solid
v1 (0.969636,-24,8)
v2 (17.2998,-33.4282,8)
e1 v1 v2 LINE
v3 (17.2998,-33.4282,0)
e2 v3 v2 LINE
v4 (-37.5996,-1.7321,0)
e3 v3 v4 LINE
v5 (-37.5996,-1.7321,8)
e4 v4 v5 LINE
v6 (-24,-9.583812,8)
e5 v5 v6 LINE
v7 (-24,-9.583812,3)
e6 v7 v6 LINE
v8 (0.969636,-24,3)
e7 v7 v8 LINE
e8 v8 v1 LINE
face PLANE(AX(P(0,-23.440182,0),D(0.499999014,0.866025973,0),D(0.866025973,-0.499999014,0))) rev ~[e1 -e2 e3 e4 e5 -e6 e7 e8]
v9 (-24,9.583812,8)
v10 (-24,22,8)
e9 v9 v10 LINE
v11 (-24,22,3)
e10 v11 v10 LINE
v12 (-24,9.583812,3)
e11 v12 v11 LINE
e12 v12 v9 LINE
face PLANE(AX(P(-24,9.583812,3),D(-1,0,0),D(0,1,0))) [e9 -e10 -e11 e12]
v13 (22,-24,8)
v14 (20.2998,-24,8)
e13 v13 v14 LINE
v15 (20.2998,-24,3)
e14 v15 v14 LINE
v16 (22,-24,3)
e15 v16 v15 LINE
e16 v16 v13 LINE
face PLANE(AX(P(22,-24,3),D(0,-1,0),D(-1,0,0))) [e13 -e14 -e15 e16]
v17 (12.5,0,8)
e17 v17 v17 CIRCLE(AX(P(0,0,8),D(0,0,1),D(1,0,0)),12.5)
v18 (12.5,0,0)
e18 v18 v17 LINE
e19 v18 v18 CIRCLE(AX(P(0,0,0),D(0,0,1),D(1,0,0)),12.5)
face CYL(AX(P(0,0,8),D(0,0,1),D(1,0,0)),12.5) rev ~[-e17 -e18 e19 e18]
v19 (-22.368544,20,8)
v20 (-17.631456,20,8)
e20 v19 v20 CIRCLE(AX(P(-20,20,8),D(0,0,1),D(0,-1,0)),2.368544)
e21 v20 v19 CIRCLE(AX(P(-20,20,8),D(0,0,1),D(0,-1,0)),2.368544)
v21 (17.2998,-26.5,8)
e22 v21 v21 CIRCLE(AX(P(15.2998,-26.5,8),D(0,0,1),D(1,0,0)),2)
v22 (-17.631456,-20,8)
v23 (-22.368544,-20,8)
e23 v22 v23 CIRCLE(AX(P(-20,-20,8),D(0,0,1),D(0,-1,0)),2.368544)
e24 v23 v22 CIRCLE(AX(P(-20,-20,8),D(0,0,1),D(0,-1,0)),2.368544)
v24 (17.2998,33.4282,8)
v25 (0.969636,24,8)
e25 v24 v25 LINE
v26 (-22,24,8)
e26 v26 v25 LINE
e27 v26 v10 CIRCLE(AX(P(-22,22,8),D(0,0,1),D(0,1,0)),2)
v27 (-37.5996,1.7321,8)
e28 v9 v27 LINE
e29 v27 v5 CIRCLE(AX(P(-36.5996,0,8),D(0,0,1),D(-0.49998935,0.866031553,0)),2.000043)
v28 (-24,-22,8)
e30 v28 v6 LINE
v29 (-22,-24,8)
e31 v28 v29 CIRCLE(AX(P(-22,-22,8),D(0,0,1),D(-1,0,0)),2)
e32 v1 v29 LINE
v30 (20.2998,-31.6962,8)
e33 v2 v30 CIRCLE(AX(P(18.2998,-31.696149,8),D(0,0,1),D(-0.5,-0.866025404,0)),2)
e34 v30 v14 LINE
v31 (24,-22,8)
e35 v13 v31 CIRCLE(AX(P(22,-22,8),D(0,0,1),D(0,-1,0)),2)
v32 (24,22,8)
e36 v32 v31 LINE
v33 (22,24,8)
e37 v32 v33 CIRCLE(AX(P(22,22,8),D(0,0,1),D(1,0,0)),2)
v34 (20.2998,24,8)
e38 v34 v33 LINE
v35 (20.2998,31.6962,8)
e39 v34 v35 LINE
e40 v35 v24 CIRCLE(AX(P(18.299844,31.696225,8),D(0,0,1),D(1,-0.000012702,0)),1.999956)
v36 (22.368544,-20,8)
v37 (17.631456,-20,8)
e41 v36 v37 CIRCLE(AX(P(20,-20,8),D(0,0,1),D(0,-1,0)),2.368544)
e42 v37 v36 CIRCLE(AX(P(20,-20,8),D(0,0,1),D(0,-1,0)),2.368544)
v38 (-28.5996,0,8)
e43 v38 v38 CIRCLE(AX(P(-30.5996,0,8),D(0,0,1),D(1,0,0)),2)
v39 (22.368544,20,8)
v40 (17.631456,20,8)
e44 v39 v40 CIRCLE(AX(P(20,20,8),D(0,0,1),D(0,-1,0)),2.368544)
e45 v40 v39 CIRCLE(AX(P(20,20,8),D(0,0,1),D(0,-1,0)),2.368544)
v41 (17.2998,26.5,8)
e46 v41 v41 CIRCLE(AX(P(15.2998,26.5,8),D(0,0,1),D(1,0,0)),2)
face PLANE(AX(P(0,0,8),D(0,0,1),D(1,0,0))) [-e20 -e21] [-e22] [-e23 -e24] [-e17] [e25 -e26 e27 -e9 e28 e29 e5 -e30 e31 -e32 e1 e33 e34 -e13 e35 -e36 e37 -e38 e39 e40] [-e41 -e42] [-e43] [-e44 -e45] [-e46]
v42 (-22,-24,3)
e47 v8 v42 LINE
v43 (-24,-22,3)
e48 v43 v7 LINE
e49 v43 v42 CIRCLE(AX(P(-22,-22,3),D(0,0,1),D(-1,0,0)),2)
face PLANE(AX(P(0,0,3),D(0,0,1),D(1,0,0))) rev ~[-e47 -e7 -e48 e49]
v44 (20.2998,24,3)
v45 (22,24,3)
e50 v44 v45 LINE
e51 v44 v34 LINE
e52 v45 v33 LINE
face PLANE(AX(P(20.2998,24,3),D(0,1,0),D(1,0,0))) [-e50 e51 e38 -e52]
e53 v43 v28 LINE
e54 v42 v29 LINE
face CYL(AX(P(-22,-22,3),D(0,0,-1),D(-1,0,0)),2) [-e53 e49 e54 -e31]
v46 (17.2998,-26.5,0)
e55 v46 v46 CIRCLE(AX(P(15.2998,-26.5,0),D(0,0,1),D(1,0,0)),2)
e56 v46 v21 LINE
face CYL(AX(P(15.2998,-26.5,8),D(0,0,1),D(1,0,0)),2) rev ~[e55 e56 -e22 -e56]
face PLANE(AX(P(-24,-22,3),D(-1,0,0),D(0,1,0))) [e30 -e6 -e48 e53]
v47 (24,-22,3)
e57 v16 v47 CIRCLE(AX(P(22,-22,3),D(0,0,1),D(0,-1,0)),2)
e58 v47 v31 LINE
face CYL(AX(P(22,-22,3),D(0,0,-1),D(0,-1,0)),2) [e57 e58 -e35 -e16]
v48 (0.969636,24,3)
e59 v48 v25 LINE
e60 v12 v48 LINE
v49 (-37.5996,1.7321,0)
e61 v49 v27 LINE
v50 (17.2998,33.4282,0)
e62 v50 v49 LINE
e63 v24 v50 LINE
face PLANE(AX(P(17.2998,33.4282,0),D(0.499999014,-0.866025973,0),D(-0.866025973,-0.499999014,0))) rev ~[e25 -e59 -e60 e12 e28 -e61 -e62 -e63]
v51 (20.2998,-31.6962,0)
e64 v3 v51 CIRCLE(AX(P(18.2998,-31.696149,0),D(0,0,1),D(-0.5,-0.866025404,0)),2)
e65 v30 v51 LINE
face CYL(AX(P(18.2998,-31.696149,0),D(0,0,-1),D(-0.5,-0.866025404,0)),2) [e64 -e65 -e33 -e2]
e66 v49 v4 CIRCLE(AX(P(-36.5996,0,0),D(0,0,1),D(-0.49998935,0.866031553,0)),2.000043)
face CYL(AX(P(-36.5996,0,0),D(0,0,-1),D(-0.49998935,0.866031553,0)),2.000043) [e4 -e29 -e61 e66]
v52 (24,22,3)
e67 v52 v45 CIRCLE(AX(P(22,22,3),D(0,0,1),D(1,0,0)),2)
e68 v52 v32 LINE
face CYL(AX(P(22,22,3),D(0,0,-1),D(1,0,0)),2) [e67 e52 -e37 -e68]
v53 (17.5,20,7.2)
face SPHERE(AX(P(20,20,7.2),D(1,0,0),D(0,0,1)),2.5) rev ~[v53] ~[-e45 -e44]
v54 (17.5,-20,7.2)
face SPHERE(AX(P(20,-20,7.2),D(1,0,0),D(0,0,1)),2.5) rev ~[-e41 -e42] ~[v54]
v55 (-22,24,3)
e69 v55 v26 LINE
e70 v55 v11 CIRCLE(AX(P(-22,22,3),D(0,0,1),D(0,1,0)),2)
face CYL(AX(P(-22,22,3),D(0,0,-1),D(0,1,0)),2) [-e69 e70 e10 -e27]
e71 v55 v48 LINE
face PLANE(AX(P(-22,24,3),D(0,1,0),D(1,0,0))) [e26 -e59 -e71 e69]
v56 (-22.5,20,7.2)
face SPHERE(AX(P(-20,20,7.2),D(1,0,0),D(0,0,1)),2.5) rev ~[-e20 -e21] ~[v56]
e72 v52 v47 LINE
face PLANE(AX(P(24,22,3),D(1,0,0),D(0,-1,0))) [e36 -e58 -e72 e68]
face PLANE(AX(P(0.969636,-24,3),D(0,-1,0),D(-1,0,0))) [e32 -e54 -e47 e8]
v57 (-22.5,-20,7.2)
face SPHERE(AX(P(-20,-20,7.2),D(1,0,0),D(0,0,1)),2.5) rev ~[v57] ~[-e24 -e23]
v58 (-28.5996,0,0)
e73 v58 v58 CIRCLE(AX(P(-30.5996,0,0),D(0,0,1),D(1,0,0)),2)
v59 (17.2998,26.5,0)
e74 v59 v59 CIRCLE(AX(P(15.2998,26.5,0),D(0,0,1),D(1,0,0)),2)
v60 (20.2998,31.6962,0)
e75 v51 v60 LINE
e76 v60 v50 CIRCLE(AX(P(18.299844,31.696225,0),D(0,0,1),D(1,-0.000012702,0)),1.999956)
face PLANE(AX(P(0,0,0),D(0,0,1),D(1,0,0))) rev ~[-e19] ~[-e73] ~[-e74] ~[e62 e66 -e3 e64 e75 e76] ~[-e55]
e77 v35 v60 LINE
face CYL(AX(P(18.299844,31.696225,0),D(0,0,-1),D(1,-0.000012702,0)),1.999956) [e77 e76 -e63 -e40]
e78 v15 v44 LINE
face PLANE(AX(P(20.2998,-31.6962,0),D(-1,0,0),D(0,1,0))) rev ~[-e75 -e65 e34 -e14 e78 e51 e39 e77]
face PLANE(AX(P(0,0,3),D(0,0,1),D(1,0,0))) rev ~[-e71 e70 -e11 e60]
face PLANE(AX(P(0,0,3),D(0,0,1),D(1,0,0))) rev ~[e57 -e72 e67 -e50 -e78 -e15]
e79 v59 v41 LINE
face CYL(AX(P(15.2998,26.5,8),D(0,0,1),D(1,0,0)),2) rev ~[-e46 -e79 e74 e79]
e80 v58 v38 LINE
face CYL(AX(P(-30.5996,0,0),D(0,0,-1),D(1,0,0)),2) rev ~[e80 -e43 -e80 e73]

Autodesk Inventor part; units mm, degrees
ref_plane "YZ Plane" through (0, 0, 0) normal (1, 0, 0) x (0, 1, 0)
ref_plane "XZ Plane" through (0, 0, 0) normal (0, 1, 0) x (-1, 0, 0)
ref_plane "XY Plane" through (0, 0, 0) normal (0, 0, 1) x (1, 0, 0)
sketch "Sketch1" plane through (0, 0, 0) normal (0, 0, 1) x (1, 0, 0)
  line L0 (15.2998, 26.5) -> (15.2998, -26.5) construction
  line L1 (15.2998, -26.5) -> (-30.5996, 0) construction
  line L2 (-30.5996, 0) -> (15.2998, 26.5) construction
  line L3 (0, 48.0119) -> (0, -48.0119) projected
  circle A0 centre (0, 0) radius 12.5
  line L4 (24.9, -24.45) -> (-24.9, -24.45) construction
  line L5 (-24.9, -24.45) -> (-24.9, 24.45) construction
  line L6 (-24.9, 24.45) -> (24.9, 24.45) construction
  line L7 (24.9, 24.45) -> (24.9, -24.45) construction
  line L8 (24.9, -24.45) -> (-24.9, 24.45) construction
  line L9 (-24.9, -24.45) -> (24.9, 24.45) construction
  line L10 (20, -20) -> (-20, -20) construction
  line L11 (-20, -20) -> (-20, 20) construction
  line L12 (-20, 20) -> (20, 20) construction
  line L13 (20, 20) -> (20, -20) construction
  line L14 (20, -20) -> (-20, 20) construction
  line L15 (-20, -20) -> (20, 20) construction
  line L16 (-37.5996, -1.7321) -> (17.2998, -33.4282)
  line L17 (20.2998, -31.6962) -> (20.2998, 31.6962)
  line L18 (17.2998, 33.4282) -> (-37.5996, 1.7321)
  arc A1 (-37.5996, 1.7321) -> (-37.5996, -1.7321) centre (-36.5996, 0) ccw
  arc A2 (20.2998, 31.6962) -> (17.2998, 33.4282) centre (18.2998, 31.6962) ccw
  arc A3 (17.2998, -33.4282) -> (20.2998, -31.6962) centre (18.2998, -31.6962) ccw
  circle A4 centre (15.2998, 26.5) radius 2
  circle A5 centre (-30.5996, 0) radius 2
  circle A6 centre (15.2998, -26.5) radius 2
  dimension "d1" = 53
  dimension "d2" = 25
  dimension "d3" = 49.8
  dimension "d4" = 48.9
  dimension "d5" = 40
  dimension "d6" = 40
  dimension "d7" = 5
  dimension "d8" = 2
  dimension "d9" = 4
  dimension "d10" = 4
  dimension "d11" = 4
extrude "Extrusion1" add sketch "Sketch1" along normal blind 3 contours L18 A2 L17 A3 L16 L3 A0 | L3 A0 L16 A1 L18
sketch "Sketch3" plane through (0, 0, 3) normal (0, 0, 1) x (1, 0, 0)
  circle A0 centre (0, 0) radius 12.5 projected
  circle A1 centre (15.2998, -26.5) radius 2 projected
  circle A2 centre (-30.5996, 0) radius 2 projected
  circle A3 centre (15.2998, 26.5) radius 2 projected
  line L0 (-37.5996, -1.7321) -> (17.2998, -33.4282) projected
  arc A4 (17.2998, -33.4282) -> (20.2998, -31.6962) centre (18.2998, -31.6962) ccw projected
  line L1 (20.2998, -31.6962) -> (20.2998, 31.6962) projected
  arc A5 (20.2998, 31.6962) -> (17.2998, 33.4282) centre (18.2998, 31.6962) ccw projected
  line L2 (17.2998, 33.4282) -> (-37.5996, 1.7321) projected
  arc A6 (-37.5996, 1.7321) -> (-37.5996, -1.7321) centre (-36.5996, 0) ccw projected
  line L3 (22, -24) -> (-22, -24)
  line L4 (-24, -22) -> (-24, 22)
  line L5 (-22, 24) -> (22, 24)
  line L6 (24, 22) -> (24, -22)
  line L7 (24, -24) -> (-24, 24) construction
  line L8 (-24, -24) -> (24, 24) construction
  arc A7 (-22, 24) -> (-24, 22) centre (-22, 22) ccw
  arc A8 (-24, -22) -> (-22, -24) centre (-22, -22) ccw
  arc A9 (22, -24) -> (24, -22) centre (22, -22) ccw
  arc A10 (24, 22) -> (22, 24) centre (22, 22) ccw
  line L9 (17.2998, 33.4282) -> (-37.5996, 1.7321) projected
  line L10 (-37.5996, -1.7321) -> (17.2998, -33.4282) projected
  line L11 (20.2998, -31.6962) -> (20.2998, 31.6962) projected
  point P0 (20.2998, 24)
  point P1 (-24, 9.5838)
  point P2 (-24, -9.5838)
  point P3 (0.9697, -24)
  point P4 (20.2998, -24)
  dimension "d14" = 48
  dimension "d15" = 48
  dimension "d16" = 2
extrude "Extrusion2" add sketch "Sketch3" along normal blind 5 contours A0 | A1 | A3 | A6 L2 L4 L0 | L4 L2 L5 L1 L3 L0 | L0 L3 A8 L4 | L3 L1 A4 L0 | L4 A7 L5 L2 | L1 L5 A10 L6 A9 L3 | L2 A5 L1 L5
sketch "Sketch4" plane through (0, 0, 8) normal (0, 0, 1) x (1, 0, 0)
  circle A0 centre (0, 0) radius 12.5 projected
  line L0 (20, -20) -> (-20, -20) construction
  line L1 (-20, -20) -> (-20, 20) construction
  line L2 (-20, 20) -> (20, 20) construction
  line L3 (20, 20) -> (20, -20) construction
  line L4 (20, -20) -> (-20, 20) construction
  line L5 (-20, -20) -> (20, 20) construction
  circle A1 centre (15.2998, 26.5) radius 2 projected
  circle A2 centre (15.2998, -26.5) radius 2 projected
  dimension "d19" = 40
  dimension "d20" = 40
extrude "Extrusion3" cut sketch "Sketch4" against normal through all
ref_plane "Work Plane1" through (-22, 0, 3) normal (0, 1, 0) x (1, 0, 0)
ref_plane "Work Plane2" through (0, -22, 3) normal (-1, 0, 0) x (0, 0, 1)
ref_plane "Work Plane3" through (-22, -20, 3) normal (0, 1, 0) x (1, 0, 0)
sketch "Sketch5" plane through (-22, -20, 3) normal (0, 1, 0) x (1, 0, 0)
  line L0 (22.9697, 0) -> (22.9697, -5) projected
  line L1 (22.9697, 0) -> (0, 0) projected
  line L2 (0, 0) -> (0, -5) projected
  line L3 (22.9697, -5) -> (0, -5) projected
  circle A0 centre (2, -4.2) radius 2.5
  line L4 (22, -11.7547) -> (22, 5.4591) projected
  line L5 (-0.5, -4.2) -> (4.5, -4.2)
  line L6 (0, 0) -> (0, -5) projected
  point P0 (22, 3)
  dimension "d24" = 5
  dimension "d25" = 20
  dimension "d26" = 0.8
revolve "Revolution1" cut sketch "Sketch5" angle 360 about axis through (-22.5, -20, 7.2) along (1, 0, 0) contours A0 L5 L2 L3 | L3 L2 L5 A0
pattern_linear "Rectangular Pattern1" count 2 spacing 40 along (1, 0, 0) count 2 spacing 40 along (0, 1, 0) of "Revolution1"
properties part number "20_Cube_Insert_Openflexure_Deltastage_Adapter"
